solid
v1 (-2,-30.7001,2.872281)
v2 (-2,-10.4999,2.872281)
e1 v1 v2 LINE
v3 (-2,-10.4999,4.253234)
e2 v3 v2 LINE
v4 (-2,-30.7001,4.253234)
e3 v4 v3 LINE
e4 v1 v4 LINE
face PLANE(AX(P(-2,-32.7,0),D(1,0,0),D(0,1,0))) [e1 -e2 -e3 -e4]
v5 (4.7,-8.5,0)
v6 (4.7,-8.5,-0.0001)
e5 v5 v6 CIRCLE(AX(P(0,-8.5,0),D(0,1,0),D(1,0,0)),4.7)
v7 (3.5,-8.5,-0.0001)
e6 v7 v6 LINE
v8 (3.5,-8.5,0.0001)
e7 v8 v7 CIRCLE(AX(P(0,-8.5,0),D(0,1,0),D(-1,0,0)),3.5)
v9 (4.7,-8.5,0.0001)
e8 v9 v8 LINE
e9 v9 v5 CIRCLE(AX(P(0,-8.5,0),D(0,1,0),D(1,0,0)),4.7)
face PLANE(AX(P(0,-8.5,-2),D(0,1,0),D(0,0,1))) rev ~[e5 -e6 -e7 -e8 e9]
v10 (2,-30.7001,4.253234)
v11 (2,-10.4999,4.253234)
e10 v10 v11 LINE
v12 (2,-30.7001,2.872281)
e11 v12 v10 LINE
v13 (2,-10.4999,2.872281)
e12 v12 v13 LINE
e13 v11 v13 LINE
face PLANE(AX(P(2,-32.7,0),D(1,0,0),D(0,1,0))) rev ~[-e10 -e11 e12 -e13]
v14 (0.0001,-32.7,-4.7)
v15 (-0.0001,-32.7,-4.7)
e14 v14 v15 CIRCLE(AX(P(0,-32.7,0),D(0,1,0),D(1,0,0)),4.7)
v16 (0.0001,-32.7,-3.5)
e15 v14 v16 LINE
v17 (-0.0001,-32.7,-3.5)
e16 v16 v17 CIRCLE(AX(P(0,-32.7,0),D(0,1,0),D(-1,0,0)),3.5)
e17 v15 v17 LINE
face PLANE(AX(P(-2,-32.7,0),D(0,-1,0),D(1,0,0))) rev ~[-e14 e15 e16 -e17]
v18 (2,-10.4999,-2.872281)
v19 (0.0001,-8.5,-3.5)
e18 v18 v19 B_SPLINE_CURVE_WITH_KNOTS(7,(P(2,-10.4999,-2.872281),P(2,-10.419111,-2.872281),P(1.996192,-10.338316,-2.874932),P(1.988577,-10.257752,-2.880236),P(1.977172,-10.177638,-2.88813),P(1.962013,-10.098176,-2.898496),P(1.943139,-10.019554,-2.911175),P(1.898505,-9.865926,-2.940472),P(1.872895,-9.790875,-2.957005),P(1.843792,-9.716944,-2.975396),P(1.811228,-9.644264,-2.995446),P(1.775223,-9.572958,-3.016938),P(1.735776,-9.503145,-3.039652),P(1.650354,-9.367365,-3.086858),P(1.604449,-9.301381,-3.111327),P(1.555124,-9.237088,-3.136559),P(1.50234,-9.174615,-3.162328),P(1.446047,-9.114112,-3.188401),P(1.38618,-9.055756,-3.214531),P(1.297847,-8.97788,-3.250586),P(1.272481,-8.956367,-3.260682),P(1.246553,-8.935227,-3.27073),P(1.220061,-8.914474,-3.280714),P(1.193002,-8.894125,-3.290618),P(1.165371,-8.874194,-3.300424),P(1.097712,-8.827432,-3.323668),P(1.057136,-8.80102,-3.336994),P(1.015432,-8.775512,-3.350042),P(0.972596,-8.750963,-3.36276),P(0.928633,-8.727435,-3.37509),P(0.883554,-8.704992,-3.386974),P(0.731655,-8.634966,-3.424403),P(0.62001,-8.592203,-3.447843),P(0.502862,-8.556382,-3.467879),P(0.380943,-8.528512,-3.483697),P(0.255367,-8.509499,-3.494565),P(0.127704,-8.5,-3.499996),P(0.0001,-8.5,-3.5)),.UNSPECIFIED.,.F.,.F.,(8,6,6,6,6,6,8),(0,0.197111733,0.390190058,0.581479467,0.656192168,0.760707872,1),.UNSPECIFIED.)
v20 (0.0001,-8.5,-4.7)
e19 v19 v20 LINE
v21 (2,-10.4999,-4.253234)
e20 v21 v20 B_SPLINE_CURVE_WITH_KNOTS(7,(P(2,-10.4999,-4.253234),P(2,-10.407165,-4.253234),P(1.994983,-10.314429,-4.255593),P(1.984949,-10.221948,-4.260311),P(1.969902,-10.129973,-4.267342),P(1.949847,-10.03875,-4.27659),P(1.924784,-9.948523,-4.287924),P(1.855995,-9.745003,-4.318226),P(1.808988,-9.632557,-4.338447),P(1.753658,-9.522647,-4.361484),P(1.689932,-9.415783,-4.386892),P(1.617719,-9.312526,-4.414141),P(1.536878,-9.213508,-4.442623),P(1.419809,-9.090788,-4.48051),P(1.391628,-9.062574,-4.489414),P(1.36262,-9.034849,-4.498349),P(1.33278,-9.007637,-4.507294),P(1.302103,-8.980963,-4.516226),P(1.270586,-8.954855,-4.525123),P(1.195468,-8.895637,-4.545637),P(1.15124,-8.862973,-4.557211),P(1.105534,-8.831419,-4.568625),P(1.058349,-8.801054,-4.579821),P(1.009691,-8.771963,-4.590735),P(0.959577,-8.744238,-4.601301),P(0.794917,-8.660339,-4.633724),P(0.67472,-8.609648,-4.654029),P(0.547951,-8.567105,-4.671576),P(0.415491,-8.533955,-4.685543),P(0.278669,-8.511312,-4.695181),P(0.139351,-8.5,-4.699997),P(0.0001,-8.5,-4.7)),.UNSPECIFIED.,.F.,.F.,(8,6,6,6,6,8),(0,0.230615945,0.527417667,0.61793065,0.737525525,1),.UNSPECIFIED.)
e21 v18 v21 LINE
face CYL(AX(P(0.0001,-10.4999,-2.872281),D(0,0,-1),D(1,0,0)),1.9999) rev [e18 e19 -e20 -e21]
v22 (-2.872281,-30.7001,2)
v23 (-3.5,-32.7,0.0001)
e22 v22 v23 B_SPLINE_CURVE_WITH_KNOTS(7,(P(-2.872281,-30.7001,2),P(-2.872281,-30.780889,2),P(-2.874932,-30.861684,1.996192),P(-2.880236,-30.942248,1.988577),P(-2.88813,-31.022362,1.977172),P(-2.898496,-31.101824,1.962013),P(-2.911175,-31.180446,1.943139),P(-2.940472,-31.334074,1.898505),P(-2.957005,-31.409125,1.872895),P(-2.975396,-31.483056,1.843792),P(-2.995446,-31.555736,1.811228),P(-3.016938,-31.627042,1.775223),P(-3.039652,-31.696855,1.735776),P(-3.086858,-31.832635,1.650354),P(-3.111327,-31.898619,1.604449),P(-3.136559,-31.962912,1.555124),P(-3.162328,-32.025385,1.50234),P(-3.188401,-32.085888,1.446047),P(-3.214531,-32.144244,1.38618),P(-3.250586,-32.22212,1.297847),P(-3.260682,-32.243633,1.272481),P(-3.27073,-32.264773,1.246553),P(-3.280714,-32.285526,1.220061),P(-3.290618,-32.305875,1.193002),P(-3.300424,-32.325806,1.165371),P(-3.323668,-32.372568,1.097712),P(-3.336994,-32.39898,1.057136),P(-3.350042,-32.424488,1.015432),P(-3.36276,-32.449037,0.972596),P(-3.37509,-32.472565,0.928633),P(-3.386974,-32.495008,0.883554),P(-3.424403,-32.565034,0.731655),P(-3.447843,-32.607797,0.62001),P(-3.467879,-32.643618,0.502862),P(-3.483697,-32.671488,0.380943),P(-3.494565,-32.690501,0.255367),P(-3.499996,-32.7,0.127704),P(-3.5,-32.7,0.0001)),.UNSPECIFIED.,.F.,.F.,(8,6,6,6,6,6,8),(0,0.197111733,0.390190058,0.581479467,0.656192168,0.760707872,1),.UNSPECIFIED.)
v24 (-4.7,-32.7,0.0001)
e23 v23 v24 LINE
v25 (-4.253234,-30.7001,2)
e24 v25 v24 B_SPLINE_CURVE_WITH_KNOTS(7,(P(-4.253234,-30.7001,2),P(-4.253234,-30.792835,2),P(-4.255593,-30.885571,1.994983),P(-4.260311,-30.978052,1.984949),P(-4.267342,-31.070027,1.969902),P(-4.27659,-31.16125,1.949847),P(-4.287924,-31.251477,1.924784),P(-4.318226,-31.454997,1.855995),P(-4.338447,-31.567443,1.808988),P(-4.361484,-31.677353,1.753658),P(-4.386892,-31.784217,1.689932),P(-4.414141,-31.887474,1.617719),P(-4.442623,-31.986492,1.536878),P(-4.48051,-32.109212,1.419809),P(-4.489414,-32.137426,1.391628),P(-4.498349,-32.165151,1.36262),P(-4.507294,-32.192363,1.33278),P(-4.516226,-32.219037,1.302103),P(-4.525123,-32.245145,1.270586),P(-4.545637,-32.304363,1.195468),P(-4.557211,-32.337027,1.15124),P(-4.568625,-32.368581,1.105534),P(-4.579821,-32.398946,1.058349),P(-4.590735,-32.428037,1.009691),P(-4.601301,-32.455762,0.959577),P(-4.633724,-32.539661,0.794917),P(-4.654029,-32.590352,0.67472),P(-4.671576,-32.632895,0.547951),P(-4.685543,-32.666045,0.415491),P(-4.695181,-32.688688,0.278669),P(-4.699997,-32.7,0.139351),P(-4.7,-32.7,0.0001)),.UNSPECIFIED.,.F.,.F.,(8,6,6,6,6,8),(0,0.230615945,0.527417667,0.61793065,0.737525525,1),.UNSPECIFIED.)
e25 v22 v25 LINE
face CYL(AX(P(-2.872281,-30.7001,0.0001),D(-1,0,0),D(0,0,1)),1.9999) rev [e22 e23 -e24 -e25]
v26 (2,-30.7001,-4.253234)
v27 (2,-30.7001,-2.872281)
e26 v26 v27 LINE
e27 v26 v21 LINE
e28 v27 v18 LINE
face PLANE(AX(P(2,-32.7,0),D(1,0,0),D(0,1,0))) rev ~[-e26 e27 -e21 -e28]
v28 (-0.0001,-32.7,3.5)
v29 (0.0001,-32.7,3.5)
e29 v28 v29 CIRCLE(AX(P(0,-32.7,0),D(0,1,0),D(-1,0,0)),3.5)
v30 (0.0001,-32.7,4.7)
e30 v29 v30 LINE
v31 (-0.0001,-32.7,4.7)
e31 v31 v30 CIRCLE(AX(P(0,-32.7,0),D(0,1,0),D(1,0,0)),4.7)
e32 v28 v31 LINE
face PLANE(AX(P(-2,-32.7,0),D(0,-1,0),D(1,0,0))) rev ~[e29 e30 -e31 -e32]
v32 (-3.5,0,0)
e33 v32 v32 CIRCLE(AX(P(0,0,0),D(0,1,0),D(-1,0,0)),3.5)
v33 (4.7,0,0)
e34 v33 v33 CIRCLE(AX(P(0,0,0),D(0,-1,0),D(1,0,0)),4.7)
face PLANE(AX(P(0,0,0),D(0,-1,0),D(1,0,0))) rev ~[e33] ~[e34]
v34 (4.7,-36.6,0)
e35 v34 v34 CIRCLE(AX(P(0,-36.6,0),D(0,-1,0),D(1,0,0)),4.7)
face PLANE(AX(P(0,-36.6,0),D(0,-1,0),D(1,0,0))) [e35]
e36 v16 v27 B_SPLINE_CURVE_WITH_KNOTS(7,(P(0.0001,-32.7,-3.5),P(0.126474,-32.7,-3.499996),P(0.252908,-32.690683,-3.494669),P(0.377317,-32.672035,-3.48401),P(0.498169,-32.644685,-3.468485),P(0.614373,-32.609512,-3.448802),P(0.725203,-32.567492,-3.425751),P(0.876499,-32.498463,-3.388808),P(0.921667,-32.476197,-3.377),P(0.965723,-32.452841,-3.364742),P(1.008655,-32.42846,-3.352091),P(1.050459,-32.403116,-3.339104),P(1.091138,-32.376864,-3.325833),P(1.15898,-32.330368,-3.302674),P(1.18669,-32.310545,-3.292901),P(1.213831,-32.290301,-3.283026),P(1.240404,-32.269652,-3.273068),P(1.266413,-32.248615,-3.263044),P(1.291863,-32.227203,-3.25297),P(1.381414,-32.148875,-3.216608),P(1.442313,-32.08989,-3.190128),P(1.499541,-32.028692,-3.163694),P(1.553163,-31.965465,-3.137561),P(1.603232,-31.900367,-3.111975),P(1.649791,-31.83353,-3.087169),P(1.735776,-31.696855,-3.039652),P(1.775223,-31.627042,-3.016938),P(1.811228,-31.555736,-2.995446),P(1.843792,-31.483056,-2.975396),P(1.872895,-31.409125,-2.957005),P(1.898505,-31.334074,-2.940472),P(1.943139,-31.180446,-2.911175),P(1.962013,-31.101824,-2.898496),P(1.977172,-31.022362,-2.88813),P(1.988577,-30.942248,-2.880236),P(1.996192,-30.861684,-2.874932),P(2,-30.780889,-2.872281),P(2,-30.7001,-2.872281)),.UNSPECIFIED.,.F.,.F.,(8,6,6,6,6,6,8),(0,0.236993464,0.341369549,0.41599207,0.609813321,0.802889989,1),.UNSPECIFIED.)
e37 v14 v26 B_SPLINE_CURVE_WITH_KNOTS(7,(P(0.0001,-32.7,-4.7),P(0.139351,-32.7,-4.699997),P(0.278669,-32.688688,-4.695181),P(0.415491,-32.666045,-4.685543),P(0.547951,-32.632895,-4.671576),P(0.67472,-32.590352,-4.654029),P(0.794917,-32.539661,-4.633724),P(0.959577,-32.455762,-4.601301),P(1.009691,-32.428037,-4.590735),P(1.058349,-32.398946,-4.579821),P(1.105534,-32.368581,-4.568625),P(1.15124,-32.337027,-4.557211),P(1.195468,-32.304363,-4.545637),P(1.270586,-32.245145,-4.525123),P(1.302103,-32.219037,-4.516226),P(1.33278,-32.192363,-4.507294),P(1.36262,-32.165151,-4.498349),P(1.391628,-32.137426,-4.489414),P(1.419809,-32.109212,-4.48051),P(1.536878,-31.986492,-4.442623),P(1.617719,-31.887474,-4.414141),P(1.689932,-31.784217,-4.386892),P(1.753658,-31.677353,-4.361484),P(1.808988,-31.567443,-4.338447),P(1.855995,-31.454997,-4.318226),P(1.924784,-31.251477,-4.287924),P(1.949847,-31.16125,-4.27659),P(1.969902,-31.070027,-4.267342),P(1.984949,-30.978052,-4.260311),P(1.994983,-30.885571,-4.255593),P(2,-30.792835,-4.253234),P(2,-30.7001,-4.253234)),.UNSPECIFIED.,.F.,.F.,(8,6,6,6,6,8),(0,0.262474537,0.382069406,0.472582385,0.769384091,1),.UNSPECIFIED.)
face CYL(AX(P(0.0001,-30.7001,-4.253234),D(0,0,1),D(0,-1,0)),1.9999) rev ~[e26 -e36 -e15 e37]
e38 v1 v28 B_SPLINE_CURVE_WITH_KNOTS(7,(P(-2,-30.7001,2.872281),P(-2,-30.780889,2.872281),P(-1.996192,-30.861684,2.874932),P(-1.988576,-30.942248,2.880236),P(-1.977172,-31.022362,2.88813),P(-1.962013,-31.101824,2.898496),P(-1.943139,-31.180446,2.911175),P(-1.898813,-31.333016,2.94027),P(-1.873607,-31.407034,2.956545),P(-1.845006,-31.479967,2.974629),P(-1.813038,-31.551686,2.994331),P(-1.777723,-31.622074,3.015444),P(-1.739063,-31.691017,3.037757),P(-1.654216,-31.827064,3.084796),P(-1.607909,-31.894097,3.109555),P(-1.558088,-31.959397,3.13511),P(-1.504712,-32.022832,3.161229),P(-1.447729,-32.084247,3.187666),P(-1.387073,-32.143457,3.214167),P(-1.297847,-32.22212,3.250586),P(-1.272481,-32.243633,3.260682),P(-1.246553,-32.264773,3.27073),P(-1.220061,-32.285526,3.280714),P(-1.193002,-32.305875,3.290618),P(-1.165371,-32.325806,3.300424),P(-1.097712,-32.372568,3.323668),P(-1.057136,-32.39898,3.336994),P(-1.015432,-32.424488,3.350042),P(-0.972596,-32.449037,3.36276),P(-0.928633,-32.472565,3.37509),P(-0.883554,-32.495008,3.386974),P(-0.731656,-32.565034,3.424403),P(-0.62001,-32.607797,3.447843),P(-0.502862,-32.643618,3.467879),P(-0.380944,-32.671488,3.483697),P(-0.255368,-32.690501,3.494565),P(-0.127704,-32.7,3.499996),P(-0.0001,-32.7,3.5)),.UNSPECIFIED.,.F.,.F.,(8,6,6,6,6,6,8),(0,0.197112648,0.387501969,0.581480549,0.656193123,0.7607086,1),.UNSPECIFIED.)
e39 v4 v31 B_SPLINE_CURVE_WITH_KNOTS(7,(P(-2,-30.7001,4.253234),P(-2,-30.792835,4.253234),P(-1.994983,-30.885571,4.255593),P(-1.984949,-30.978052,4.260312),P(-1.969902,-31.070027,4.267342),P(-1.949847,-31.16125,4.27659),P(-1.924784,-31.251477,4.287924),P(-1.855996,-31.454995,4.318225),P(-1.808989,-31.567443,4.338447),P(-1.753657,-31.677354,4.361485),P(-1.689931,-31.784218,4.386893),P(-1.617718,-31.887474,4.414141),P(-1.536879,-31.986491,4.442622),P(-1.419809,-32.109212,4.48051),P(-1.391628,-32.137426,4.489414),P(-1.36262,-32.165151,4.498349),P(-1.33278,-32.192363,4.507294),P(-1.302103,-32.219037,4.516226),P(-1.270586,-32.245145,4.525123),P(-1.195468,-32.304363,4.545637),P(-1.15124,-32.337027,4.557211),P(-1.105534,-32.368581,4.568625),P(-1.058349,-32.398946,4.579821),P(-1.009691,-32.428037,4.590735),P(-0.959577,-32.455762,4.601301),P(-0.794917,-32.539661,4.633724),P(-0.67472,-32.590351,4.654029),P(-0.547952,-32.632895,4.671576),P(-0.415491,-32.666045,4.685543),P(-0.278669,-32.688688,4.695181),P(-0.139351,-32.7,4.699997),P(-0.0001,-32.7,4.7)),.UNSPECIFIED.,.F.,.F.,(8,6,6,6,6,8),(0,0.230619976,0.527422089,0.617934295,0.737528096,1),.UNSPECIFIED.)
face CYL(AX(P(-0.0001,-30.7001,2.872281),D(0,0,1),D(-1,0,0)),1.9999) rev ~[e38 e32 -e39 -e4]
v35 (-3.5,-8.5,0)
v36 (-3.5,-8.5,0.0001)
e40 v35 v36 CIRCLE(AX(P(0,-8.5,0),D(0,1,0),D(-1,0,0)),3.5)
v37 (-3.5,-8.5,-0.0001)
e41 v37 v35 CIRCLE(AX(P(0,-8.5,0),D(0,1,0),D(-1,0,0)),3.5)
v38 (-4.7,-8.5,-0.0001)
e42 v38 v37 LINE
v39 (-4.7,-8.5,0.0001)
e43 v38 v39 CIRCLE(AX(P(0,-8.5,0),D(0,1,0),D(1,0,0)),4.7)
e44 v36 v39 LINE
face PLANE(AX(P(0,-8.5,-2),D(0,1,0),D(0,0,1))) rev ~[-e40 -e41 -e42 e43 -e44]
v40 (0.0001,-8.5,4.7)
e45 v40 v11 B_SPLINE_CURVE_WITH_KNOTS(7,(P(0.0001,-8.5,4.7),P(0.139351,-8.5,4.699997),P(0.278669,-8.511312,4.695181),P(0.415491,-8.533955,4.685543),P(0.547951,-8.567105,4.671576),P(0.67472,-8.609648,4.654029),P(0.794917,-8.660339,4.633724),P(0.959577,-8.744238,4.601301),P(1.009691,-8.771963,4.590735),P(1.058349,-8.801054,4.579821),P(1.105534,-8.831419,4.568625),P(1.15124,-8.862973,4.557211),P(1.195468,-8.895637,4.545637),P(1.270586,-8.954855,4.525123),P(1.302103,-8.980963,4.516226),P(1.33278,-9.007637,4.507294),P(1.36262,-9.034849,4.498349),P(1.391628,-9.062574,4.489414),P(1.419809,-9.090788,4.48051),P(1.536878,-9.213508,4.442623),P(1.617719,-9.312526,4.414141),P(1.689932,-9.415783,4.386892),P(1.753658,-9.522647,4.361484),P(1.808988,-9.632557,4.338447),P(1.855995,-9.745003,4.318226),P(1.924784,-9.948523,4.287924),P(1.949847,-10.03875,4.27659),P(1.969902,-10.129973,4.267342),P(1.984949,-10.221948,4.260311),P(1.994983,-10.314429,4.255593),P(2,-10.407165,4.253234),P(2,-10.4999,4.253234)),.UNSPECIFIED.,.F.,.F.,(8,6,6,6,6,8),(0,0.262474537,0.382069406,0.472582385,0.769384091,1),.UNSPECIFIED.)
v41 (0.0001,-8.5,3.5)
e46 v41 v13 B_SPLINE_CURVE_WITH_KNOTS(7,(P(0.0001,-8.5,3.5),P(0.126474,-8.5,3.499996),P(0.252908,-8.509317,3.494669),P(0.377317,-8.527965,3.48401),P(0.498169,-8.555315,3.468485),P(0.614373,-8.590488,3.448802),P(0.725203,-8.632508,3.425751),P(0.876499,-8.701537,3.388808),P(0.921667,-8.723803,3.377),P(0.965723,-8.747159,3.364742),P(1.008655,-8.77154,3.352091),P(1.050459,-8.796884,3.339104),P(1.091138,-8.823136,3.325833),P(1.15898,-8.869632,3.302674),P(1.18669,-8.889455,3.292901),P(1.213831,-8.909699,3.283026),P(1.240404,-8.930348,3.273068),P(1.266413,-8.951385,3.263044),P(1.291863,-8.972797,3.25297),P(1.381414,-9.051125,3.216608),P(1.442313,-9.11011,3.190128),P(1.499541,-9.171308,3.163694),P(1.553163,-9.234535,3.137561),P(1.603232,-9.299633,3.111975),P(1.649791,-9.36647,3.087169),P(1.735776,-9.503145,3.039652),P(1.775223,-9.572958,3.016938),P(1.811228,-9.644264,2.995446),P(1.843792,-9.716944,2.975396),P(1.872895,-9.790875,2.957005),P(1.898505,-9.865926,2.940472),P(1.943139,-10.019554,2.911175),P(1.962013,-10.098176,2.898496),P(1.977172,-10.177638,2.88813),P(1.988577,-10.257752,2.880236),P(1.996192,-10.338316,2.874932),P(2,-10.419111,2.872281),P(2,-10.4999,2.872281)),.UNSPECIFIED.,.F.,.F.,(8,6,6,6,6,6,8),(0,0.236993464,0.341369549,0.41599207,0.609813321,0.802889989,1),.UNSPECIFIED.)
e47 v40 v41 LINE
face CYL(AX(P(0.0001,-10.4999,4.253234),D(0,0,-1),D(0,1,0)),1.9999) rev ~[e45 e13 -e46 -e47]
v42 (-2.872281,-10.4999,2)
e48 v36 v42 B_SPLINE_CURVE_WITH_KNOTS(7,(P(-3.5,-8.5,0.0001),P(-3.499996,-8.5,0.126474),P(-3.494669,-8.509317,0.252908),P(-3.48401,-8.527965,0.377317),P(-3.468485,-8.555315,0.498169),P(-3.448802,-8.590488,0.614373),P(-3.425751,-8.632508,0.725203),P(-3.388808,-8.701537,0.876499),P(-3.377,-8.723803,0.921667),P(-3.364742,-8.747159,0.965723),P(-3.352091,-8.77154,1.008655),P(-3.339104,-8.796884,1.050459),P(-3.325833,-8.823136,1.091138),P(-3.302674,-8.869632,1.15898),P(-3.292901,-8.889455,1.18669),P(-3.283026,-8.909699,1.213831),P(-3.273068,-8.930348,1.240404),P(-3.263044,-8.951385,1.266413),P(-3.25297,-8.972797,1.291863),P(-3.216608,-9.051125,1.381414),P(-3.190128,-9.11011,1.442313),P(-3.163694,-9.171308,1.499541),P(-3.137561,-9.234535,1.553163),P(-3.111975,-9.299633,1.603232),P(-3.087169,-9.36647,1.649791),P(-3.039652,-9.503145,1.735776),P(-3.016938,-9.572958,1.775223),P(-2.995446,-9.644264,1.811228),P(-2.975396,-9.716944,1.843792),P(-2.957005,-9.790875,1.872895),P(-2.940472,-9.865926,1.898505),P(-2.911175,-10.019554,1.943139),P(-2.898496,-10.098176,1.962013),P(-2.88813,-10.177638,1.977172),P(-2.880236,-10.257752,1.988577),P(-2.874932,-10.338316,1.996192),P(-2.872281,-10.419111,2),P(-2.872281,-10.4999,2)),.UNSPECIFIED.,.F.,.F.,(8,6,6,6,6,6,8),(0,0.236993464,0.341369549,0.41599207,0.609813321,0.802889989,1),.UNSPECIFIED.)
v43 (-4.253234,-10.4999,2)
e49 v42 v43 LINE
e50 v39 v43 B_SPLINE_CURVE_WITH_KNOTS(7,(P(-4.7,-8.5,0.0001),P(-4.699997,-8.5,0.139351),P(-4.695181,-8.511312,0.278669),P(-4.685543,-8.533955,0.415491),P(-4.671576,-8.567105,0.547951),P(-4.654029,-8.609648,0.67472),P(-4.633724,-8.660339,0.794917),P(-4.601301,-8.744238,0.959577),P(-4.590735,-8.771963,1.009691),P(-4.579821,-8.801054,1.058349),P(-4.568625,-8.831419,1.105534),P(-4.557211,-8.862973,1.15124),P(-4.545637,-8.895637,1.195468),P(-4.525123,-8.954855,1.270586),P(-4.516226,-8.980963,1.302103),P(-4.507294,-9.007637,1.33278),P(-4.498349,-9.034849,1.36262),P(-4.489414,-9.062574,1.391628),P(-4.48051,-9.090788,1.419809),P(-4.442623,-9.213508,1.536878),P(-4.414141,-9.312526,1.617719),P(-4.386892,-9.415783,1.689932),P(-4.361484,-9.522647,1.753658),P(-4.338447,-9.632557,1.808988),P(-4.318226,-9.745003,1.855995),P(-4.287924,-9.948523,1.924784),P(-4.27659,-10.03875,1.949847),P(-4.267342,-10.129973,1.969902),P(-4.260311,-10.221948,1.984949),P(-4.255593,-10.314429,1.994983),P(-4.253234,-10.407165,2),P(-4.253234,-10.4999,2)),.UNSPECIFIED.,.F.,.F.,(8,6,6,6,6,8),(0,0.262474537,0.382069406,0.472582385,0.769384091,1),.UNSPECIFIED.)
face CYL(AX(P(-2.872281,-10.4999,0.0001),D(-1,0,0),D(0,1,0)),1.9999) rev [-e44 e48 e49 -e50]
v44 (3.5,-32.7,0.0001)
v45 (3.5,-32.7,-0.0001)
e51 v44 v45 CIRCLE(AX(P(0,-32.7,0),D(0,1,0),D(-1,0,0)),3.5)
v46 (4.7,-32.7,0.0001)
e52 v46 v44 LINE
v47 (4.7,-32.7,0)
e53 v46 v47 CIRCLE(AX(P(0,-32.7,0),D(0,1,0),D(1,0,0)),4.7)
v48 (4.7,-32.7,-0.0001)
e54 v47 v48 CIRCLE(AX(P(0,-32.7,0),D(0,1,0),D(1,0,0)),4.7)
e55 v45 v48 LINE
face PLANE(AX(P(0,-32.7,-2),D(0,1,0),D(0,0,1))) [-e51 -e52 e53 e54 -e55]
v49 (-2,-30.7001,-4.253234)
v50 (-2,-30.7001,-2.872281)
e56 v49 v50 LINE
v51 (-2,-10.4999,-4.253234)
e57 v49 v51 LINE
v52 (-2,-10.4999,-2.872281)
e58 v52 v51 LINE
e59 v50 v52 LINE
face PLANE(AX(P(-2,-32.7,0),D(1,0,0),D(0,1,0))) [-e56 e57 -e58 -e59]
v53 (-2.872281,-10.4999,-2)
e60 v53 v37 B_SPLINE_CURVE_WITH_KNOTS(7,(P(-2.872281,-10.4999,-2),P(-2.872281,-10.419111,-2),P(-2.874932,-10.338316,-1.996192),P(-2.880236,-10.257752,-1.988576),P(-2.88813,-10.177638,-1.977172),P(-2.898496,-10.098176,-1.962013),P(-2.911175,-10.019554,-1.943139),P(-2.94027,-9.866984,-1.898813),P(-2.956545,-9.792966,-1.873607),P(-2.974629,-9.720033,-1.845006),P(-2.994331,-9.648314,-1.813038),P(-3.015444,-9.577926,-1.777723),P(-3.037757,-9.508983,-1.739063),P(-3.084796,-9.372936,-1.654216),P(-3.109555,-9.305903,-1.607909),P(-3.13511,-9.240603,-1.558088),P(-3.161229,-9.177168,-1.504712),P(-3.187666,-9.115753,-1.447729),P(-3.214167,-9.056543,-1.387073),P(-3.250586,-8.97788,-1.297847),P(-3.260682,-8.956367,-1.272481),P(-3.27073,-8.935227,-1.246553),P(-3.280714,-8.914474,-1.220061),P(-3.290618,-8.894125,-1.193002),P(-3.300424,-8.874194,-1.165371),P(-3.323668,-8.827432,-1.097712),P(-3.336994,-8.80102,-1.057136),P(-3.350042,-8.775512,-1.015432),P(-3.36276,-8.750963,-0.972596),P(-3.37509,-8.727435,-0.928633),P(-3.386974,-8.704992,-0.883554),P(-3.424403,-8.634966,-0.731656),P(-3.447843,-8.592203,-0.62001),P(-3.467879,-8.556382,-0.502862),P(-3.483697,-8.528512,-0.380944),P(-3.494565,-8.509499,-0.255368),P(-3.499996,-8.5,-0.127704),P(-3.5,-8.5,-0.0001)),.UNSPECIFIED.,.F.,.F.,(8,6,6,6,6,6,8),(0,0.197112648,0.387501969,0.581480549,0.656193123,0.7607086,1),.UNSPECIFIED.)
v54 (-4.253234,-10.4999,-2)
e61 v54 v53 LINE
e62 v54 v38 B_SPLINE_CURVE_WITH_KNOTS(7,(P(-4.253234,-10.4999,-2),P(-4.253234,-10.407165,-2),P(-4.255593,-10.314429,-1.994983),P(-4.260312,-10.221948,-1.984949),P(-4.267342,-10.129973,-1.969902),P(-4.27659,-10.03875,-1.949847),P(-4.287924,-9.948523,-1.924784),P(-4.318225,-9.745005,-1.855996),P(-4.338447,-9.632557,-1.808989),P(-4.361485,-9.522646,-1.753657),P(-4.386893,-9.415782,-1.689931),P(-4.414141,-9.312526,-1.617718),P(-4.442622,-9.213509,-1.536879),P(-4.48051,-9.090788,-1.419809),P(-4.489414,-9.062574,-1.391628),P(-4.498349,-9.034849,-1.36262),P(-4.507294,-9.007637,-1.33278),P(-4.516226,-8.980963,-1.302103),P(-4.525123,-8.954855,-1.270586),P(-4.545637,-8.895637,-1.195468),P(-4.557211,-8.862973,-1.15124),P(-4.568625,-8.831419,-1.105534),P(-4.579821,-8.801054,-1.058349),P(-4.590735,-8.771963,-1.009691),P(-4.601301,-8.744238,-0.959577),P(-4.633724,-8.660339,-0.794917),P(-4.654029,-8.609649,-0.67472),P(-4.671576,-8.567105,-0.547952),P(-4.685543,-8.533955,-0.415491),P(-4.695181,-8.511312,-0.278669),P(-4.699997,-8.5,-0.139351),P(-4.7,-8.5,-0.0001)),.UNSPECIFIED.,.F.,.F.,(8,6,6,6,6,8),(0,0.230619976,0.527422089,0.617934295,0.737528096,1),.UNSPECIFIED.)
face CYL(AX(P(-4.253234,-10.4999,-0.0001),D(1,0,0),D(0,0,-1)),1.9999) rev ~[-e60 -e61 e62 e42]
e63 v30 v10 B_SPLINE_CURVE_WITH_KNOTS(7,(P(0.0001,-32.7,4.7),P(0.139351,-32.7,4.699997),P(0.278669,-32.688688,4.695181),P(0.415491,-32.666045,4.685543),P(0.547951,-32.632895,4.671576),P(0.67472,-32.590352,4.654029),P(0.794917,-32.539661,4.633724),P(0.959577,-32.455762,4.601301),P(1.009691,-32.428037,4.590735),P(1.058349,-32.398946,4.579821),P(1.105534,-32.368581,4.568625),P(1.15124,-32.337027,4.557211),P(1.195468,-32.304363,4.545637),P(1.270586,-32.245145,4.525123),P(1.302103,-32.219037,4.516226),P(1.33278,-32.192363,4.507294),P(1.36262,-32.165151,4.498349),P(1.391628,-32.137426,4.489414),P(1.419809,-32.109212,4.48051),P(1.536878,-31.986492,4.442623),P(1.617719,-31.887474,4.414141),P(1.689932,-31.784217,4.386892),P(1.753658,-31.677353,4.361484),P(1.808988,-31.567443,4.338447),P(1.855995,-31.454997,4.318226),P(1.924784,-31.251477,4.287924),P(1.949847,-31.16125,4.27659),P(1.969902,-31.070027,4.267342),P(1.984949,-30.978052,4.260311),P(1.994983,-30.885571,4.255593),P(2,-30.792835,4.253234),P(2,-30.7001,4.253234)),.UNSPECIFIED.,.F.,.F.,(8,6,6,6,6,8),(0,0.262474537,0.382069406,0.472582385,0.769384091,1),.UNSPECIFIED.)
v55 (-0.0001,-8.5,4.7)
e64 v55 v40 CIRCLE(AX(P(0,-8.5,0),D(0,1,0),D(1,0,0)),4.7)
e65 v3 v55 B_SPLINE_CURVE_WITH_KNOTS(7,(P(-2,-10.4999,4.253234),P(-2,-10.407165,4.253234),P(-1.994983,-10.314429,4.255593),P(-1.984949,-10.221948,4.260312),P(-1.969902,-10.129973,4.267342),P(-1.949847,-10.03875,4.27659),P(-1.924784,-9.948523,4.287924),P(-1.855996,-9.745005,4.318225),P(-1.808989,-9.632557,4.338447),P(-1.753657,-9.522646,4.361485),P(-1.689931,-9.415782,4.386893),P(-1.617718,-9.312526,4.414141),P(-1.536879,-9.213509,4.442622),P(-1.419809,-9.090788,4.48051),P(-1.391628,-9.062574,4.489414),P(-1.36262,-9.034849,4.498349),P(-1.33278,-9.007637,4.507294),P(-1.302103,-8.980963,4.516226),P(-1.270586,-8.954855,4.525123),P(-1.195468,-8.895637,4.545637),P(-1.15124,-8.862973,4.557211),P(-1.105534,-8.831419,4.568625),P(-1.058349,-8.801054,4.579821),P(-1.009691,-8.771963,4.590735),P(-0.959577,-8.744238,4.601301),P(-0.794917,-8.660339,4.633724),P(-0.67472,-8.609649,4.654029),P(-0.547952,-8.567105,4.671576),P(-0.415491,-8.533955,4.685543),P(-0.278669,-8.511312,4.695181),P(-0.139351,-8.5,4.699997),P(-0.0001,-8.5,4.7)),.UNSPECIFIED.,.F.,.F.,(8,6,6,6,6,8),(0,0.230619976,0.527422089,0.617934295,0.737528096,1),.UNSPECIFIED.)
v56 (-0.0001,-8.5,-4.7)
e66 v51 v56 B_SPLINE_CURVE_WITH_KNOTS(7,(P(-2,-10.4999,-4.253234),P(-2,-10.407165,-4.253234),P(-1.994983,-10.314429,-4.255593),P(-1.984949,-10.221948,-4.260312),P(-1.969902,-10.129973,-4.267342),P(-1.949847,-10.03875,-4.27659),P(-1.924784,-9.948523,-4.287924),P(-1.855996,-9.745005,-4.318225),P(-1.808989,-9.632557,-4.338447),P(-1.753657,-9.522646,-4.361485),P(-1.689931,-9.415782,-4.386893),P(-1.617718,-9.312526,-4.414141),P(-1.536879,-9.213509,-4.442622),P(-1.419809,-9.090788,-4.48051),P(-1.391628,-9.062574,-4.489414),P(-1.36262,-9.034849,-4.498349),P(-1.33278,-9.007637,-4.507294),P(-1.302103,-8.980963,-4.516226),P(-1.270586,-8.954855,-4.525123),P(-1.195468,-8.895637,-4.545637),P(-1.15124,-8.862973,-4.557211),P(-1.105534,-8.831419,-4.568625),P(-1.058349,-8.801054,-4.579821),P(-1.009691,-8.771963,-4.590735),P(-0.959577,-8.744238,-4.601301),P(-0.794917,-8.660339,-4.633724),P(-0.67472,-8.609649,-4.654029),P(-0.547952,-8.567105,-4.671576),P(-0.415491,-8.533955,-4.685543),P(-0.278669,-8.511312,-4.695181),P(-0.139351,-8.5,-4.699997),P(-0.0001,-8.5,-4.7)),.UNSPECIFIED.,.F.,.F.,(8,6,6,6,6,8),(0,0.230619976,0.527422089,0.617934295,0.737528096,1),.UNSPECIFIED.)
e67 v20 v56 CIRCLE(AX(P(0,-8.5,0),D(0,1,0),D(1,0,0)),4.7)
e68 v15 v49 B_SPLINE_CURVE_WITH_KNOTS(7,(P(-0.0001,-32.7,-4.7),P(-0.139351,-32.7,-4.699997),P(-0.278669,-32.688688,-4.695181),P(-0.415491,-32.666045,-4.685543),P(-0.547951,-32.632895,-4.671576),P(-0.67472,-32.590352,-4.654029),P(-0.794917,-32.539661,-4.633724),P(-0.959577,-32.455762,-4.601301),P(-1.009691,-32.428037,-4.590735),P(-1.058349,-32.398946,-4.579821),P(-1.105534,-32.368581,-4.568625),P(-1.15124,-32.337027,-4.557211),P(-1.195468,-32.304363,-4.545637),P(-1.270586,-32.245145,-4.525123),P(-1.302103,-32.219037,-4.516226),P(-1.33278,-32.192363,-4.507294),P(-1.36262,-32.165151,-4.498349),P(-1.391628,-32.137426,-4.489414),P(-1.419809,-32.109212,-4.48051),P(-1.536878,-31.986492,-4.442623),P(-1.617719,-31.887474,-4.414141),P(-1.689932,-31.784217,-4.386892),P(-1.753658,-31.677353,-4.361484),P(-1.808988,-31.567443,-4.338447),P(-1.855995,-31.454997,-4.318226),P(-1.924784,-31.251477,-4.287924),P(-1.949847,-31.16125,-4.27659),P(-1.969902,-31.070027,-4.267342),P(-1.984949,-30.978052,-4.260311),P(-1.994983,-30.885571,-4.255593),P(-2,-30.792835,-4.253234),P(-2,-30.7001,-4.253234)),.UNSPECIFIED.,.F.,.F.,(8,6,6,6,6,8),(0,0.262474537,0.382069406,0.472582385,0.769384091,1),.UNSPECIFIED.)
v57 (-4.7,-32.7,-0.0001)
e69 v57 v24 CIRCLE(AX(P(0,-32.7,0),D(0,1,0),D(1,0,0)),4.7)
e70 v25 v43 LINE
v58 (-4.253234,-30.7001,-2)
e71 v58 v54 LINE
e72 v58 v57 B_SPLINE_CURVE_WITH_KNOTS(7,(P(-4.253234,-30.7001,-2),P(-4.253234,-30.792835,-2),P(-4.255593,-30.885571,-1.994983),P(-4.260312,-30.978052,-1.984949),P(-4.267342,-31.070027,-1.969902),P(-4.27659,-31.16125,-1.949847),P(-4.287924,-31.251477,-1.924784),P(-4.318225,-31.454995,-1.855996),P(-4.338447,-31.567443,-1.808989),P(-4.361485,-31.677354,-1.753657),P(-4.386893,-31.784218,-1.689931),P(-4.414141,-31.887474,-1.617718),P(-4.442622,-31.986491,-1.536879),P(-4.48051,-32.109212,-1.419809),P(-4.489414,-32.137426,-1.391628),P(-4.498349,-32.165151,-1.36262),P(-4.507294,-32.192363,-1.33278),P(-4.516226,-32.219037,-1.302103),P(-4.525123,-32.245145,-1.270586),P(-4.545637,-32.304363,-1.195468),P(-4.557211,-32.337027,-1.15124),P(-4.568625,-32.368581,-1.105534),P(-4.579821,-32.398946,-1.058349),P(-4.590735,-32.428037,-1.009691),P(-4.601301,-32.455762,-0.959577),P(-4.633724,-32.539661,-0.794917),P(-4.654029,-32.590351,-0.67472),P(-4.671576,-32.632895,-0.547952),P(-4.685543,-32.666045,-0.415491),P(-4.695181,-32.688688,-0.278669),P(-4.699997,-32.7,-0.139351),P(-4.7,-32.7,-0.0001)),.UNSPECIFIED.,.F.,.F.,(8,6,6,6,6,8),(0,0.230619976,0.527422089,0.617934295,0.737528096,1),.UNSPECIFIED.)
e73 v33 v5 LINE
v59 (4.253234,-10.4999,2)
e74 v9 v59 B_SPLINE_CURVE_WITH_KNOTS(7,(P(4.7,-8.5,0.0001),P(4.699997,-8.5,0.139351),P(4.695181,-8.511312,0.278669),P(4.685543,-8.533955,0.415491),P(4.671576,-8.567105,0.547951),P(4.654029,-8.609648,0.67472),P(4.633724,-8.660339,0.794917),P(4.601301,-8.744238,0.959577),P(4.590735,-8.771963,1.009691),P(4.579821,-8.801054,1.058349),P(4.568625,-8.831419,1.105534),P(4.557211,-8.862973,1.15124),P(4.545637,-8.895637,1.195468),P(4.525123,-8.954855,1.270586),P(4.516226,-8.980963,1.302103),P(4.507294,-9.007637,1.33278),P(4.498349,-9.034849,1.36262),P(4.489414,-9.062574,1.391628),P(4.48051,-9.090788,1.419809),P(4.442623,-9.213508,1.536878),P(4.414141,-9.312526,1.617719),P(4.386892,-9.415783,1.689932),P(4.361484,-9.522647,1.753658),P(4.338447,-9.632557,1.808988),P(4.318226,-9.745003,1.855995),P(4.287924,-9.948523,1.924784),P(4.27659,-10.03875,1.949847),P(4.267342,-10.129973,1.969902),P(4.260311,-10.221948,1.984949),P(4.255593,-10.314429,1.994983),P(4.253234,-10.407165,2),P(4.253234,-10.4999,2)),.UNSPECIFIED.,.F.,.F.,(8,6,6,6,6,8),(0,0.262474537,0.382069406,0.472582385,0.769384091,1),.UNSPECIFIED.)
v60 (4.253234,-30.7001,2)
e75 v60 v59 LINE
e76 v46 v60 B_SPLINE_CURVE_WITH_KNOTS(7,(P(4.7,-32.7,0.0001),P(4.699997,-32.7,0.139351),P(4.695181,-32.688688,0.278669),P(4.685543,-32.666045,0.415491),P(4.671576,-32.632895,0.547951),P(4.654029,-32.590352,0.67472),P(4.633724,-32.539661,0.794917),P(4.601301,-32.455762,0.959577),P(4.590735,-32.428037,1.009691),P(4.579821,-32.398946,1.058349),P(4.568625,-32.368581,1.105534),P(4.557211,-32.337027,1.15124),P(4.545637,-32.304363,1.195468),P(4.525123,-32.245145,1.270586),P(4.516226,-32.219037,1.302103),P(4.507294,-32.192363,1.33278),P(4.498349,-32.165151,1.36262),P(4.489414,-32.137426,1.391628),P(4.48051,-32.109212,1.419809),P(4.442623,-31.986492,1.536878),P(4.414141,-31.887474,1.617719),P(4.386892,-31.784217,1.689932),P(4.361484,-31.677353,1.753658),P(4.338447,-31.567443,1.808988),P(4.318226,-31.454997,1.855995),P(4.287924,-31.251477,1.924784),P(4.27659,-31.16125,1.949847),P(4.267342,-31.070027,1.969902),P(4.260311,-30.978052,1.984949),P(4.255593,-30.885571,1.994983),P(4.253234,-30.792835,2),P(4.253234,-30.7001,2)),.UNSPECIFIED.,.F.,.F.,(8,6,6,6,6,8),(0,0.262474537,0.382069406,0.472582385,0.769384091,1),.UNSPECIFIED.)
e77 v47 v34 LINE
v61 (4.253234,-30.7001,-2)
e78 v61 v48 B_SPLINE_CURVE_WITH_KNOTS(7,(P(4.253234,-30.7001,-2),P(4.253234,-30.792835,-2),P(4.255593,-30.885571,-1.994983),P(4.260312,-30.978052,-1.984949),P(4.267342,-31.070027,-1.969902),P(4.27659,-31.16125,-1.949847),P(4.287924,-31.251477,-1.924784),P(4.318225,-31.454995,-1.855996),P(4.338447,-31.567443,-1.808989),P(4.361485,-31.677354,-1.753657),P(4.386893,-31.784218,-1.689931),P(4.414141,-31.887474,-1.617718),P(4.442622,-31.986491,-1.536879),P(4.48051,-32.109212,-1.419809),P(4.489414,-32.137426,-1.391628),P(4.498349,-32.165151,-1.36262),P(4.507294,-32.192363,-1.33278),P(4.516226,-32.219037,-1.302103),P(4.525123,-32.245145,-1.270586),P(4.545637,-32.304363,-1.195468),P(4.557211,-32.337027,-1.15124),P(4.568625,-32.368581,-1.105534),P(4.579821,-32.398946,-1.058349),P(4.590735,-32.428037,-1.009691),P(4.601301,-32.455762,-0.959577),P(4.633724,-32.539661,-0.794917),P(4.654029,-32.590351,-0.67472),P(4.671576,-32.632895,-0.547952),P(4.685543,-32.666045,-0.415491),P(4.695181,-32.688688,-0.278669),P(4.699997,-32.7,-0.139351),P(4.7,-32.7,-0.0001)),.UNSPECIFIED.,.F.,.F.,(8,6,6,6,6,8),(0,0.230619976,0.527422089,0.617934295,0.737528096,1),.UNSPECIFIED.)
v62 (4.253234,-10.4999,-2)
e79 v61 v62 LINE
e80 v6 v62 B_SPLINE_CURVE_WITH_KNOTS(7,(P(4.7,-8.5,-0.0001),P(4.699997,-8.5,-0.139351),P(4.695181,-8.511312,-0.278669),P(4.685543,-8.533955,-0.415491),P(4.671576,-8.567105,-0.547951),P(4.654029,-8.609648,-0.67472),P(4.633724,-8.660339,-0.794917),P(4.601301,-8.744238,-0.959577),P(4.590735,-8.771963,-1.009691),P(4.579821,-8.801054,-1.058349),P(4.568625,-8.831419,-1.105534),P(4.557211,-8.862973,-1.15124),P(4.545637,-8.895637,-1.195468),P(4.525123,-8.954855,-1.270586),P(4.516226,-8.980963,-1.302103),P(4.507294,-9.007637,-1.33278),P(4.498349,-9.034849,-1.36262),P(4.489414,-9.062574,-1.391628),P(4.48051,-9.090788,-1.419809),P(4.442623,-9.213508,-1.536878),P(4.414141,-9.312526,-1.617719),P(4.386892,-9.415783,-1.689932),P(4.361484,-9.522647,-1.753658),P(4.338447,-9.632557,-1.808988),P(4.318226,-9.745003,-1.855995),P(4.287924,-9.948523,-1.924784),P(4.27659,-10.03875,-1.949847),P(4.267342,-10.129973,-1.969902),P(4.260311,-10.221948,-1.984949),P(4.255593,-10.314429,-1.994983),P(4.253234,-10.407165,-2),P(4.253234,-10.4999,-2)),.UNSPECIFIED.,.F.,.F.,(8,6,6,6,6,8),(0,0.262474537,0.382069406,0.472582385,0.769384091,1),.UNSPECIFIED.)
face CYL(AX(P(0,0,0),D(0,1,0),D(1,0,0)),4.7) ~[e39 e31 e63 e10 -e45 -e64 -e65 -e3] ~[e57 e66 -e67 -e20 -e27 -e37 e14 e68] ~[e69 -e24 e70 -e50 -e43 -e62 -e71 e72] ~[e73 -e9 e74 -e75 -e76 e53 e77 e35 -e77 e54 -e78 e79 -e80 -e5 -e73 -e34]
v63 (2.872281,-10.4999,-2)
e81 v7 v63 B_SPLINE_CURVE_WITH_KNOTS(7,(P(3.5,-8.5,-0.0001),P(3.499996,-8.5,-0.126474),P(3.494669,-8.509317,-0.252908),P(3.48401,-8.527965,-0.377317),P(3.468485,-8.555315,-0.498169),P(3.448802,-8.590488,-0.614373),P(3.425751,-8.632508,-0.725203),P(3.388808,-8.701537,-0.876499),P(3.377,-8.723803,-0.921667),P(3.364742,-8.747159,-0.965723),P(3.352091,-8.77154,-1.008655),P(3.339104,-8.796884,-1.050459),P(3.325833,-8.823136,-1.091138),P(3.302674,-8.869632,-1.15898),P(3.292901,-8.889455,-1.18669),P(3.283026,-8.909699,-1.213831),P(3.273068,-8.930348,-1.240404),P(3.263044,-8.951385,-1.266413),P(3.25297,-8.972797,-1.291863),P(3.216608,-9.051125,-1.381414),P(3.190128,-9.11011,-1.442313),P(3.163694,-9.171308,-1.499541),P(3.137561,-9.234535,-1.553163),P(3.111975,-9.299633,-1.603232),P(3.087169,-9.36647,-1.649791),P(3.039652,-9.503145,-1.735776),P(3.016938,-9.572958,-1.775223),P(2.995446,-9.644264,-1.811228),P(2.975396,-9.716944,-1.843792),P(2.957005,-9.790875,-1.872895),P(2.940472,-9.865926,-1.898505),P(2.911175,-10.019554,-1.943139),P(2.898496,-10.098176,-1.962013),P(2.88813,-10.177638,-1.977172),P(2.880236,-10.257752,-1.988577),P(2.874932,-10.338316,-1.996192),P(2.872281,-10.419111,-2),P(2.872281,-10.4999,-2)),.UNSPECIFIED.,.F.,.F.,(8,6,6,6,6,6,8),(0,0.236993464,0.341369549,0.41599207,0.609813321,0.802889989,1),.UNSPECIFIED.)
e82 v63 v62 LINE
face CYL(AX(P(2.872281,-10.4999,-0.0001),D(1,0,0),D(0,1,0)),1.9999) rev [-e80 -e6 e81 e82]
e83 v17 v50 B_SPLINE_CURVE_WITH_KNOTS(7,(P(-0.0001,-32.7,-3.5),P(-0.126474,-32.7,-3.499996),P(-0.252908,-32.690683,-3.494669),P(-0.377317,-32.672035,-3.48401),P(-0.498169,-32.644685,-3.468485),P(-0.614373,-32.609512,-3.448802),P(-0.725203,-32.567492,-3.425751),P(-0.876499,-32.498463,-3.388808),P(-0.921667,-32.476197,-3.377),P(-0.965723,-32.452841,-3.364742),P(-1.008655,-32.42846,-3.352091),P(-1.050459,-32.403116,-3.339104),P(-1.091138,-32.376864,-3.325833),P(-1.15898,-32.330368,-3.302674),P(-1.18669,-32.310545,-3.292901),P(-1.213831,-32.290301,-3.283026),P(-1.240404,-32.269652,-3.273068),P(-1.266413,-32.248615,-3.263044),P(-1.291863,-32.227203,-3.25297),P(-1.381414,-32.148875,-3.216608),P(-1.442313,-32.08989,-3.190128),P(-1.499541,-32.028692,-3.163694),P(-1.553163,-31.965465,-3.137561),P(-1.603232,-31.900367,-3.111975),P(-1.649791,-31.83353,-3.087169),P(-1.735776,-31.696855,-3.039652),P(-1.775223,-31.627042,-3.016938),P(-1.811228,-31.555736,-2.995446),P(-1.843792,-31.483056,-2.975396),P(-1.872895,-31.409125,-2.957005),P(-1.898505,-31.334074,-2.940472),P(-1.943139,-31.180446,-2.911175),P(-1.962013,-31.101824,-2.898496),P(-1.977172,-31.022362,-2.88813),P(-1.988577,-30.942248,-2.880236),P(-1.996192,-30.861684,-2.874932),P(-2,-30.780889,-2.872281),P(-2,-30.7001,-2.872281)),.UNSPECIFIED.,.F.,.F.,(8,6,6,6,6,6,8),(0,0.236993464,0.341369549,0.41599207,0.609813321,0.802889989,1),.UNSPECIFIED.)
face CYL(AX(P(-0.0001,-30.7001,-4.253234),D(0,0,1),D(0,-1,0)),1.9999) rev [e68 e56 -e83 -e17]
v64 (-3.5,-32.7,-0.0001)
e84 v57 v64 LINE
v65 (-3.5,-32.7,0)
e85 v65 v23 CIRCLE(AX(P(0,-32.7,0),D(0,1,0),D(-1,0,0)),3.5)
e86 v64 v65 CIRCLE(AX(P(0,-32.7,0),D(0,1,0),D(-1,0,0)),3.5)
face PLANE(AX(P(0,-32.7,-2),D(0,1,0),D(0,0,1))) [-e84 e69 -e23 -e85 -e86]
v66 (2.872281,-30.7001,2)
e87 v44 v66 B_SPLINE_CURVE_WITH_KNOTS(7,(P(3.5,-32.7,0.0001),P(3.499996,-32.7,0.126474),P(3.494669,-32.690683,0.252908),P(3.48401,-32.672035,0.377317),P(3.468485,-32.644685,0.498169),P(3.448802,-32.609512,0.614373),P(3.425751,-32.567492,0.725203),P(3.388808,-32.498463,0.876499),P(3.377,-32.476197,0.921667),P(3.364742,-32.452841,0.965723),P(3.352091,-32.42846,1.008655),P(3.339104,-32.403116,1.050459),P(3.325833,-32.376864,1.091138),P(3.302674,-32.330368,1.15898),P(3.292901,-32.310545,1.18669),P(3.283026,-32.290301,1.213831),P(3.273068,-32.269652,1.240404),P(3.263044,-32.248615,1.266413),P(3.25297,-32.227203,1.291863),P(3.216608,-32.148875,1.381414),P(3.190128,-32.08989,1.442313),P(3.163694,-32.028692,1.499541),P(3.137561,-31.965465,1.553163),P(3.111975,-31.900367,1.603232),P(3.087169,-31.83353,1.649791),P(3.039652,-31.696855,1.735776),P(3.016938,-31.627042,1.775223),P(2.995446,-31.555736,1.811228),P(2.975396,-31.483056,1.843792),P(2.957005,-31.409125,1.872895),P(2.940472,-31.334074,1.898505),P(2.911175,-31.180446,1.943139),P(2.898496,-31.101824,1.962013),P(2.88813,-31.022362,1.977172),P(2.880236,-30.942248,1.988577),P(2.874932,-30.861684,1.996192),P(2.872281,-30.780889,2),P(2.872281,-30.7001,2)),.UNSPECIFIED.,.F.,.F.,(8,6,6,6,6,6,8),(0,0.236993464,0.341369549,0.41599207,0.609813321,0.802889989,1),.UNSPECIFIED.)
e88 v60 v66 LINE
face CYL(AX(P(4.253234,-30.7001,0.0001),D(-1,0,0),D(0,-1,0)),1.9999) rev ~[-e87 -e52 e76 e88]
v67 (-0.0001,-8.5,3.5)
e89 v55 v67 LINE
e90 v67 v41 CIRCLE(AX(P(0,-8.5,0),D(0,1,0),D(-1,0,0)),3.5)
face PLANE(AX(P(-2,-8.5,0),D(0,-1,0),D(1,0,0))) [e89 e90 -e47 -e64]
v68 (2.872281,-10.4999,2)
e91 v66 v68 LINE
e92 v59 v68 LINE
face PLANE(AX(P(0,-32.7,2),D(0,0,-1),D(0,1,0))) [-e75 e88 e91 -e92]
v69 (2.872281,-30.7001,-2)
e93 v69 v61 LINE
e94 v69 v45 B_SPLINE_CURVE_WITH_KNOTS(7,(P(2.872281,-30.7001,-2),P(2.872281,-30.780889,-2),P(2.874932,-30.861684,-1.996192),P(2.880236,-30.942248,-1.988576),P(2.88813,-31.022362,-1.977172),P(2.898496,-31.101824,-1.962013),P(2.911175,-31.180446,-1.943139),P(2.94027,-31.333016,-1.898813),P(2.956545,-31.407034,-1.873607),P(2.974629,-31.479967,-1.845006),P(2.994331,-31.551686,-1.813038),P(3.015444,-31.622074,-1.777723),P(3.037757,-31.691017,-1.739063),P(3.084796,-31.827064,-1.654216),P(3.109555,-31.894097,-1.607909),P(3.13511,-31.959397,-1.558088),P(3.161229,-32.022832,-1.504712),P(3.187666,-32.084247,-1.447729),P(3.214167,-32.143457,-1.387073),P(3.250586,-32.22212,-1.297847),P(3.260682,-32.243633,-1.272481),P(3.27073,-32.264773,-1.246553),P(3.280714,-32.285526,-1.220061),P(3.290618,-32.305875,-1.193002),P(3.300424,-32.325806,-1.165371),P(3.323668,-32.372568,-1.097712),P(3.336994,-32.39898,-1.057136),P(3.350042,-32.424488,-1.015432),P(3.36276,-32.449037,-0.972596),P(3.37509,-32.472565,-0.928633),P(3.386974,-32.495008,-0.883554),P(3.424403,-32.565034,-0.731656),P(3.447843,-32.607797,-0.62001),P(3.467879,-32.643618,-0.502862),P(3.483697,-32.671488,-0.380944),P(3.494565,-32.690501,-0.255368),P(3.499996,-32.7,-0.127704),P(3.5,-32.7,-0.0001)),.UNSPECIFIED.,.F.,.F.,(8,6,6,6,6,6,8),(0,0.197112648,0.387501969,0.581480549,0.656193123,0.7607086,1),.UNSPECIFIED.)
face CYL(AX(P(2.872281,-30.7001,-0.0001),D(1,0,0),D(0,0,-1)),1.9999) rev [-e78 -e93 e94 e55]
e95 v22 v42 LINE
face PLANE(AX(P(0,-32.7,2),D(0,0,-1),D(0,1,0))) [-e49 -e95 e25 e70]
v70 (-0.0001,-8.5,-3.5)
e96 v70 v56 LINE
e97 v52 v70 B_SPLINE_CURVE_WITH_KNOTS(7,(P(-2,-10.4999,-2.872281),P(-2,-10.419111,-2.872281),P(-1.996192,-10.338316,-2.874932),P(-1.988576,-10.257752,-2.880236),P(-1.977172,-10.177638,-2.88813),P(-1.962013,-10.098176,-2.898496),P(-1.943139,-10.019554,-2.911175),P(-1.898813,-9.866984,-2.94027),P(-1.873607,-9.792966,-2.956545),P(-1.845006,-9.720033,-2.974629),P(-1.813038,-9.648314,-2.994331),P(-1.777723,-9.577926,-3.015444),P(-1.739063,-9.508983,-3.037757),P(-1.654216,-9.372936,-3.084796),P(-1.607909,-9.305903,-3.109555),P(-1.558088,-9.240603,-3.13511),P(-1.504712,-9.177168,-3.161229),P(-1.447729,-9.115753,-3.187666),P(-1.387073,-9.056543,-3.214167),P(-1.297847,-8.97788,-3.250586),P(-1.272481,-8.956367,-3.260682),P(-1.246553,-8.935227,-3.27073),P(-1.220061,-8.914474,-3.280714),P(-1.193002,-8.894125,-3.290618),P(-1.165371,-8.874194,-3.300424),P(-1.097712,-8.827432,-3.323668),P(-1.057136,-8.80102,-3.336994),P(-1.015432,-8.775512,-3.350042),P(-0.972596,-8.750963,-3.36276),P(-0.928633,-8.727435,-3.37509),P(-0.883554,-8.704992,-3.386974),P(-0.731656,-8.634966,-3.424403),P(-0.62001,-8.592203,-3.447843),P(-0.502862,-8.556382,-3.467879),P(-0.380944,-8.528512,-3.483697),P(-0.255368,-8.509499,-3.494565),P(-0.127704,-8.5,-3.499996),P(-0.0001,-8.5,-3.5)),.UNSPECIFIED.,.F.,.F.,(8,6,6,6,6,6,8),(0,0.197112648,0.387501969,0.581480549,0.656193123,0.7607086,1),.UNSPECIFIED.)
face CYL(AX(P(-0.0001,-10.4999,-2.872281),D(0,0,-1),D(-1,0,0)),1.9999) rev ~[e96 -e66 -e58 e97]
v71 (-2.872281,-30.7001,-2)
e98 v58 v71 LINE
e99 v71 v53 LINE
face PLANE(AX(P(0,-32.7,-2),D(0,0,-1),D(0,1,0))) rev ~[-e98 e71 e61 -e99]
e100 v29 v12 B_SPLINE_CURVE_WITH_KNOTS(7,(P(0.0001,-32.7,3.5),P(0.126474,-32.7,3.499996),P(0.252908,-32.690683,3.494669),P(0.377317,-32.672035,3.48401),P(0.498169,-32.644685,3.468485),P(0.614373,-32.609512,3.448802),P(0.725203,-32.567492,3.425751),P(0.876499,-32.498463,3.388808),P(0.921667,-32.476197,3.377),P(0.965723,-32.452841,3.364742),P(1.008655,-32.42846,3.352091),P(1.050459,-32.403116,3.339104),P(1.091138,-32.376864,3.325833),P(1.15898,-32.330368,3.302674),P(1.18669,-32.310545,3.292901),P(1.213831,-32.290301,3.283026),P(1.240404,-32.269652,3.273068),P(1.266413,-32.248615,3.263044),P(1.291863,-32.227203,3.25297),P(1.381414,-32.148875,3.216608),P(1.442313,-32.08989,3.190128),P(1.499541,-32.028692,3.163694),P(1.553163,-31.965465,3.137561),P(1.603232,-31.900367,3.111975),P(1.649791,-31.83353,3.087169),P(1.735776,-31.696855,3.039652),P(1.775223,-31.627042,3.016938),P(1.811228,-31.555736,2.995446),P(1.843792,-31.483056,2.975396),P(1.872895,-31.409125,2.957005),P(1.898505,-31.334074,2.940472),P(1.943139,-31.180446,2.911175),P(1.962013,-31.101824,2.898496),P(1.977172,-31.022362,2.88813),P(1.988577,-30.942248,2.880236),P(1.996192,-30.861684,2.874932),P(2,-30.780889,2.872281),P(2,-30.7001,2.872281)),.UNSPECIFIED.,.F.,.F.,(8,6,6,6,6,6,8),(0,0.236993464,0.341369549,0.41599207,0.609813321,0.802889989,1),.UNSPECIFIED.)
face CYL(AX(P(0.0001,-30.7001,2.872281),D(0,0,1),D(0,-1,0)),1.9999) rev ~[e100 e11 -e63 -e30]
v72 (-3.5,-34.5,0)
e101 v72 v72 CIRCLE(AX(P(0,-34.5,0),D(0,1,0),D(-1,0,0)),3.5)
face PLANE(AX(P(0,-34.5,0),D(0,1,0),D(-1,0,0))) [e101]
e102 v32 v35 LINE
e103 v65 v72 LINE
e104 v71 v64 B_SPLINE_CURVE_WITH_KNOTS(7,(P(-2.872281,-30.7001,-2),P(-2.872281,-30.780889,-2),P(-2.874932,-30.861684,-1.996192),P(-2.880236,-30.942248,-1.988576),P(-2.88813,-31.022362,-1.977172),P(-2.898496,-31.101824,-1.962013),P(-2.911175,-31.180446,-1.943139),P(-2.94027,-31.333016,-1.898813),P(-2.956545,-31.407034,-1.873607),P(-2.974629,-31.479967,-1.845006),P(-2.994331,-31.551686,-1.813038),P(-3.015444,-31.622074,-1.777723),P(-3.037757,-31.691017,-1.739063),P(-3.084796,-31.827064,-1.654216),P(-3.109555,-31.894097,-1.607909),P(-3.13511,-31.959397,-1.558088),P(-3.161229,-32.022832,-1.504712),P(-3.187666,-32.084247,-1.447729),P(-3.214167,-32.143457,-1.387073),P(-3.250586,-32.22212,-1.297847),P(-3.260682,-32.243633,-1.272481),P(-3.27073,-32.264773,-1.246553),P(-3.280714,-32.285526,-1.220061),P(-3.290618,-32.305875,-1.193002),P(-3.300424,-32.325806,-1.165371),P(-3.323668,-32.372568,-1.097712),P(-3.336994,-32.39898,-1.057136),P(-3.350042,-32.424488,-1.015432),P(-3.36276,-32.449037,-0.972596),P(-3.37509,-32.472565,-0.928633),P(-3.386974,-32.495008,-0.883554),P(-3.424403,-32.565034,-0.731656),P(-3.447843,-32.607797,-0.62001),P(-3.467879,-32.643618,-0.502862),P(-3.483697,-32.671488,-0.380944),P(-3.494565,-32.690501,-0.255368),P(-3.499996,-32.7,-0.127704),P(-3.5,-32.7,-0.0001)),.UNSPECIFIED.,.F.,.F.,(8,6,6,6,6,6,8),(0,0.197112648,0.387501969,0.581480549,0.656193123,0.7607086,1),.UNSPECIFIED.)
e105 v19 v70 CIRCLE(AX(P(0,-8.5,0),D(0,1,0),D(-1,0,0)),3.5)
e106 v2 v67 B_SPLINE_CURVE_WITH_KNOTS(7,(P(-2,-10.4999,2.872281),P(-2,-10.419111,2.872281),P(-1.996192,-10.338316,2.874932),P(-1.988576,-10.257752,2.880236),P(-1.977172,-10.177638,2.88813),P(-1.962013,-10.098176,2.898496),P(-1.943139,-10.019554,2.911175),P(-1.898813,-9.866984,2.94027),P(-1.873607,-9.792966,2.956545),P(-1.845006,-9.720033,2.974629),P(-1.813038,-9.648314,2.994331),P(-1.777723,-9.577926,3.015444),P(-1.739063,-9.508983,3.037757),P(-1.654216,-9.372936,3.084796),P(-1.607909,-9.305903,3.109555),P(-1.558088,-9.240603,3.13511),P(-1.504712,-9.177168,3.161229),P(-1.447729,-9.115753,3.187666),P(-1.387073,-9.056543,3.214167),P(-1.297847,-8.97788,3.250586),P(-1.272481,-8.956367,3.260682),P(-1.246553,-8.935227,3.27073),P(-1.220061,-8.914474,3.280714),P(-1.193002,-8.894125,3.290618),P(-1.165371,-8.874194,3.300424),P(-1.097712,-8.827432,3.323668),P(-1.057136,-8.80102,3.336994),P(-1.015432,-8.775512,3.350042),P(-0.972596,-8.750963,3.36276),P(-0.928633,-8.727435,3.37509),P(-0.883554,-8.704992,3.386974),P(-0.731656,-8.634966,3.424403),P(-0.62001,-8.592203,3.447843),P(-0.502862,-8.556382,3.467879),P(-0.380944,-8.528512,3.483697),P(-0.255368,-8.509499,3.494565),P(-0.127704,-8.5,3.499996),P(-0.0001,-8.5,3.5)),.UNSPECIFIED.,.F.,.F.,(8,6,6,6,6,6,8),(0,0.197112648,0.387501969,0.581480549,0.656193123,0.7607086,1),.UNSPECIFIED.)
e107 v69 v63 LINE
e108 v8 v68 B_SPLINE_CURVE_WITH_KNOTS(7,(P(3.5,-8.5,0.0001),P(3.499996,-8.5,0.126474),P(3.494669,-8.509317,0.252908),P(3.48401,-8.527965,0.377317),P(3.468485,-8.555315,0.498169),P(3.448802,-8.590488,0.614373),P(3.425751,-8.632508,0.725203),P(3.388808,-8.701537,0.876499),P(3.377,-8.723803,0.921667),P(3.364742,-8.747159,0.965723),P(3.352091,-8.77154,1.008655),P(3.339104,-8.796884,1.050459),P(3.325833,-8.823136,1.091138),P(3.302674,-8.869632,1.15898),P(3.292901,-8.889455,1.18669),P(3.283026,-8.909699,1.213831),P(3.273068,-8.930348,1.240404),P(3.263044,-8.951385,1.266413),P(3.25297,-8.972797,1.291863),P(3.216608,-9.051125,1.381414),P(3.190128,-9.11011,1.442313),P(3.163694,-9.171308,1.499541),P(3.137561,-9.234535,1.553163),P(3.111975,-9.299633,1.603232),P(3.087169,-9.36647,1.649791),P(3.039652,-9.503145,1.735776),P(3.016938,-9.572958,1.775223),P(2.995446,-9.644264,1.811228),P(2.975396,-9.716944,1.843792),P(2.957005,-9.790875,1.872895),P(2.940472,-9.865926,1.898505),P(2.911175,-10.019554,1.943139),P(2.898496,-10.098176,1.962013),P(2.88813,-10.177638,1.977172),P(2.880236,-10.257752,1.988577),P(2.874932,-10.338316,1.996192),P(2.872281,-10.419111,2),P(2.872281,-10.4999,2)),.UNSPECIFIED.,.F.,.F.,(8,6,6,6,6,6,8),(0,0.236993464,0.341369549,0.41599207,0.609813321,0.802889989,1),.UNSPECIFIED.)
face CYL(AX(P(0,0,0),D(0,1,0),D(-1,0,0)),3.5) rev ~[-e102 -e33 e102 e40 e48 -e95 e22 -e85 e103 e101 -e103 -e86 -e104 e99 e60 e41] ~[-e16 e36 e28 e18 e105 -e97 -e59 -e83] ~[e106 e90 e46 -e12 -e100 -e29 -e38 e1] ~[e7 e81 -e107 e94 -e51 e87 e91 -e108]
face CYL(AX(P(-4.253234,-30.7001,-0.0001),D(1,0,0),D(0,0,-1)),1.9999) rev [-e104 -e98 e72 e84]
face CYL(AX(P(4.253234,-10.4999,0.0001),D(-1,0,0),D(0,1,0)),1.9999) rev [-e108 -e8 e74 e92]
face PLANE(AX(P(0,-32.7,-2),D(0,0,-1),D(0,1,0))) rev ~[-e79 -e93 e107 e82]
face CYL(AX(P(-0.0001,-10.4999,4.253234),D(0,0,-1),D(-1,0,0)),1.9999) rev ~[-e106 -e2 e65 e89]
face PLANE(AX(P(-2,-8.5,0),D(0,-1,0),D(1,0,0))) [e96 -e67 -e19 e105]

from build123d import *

# Parameters (mm, degrees)
F0_R     = 4.7
F1_DEPTH = 36.6
F2_R     = 3.5
F3_DEPTH = 34.5
F4_W     = 4
F4_H     = 24.2
F5_DEPTH = 12.5
F6_W     = 24.2
F6_H     = 4
F7_DEPTH = 12.5
F8_R     = 1.9999


# Not quite as in the source:
# - a fillet or chamfer is up to 0.001 mm smaller than in the source, because OpenCascade refuses the exact size


with BuildPart() as f1:
    # F0 (on Front) → F1 (new body)
    with BuildSketch(Plane.XZ):
        Circle(F0_R)
    extrude(amount=F1_DEPTH)

    # F2 (on face) → F3 (cut)
    with BuildSketch(Plane(origin=(0, 0, 0), x_dir=(-1, 0, 0), z_dir=(0, 1, 0))):
        Circle(F2_R)
    extrude(amount=-F3_DEPTH, mode=Mode.SUBTRACT)

    # F4 (on Top) → F5 (cut, symmetric)
    with BuildSketch(Plane.XY):
        with Locations((0, -20.6)):
            Rectangle(F4_W, F4_H)
    extrude(amount=F5_DEPTH, both=True, mode=Mode.SUBTRACT)

    # F6 (on Right) → F7 (cut, symmetric)
    with BuildSketch(Plane.YZ):
        with Locations((-20.6, 0)):
            Rectangle(F6_W, F6_H)
    extrude(amount=F7_DEPTH, both=True, mode=Mode.SUBTRACT)

    # F8 (radius 2 in the source; OpenCascade refuses exactly that, so slightly less here)
    f8_edges = [f1.edges().sort_by_distance(p)[0] for p in [
        (2, -8.5, 3.562758),
        (2, -8.5, -3.562758),
        (-2, -8.5, 3.562758),
        (-2, -8.5, -3.562758),
        (3.562758, -8.5, -2),
        (-3.562758, -8.5, -2),
        (3.562758, -8.5, 2),
        (-3.562758, -8.5, 2),
        (3.562758, -32.7, 2),
        (-3.562758, -32.7, 2),
        (3.562758, -32.7, -2),
        (-3.562758, -32.7, -2),
        (-2, -32.7, 3.562758),
        (-2, -32.7, -3.562758),
        (2, -32.7, 3.562758),
        (2, -32.7, -3.562758),
    ]]
    fillet(f8_edges, radius=F8_R)


solid = f1.part
